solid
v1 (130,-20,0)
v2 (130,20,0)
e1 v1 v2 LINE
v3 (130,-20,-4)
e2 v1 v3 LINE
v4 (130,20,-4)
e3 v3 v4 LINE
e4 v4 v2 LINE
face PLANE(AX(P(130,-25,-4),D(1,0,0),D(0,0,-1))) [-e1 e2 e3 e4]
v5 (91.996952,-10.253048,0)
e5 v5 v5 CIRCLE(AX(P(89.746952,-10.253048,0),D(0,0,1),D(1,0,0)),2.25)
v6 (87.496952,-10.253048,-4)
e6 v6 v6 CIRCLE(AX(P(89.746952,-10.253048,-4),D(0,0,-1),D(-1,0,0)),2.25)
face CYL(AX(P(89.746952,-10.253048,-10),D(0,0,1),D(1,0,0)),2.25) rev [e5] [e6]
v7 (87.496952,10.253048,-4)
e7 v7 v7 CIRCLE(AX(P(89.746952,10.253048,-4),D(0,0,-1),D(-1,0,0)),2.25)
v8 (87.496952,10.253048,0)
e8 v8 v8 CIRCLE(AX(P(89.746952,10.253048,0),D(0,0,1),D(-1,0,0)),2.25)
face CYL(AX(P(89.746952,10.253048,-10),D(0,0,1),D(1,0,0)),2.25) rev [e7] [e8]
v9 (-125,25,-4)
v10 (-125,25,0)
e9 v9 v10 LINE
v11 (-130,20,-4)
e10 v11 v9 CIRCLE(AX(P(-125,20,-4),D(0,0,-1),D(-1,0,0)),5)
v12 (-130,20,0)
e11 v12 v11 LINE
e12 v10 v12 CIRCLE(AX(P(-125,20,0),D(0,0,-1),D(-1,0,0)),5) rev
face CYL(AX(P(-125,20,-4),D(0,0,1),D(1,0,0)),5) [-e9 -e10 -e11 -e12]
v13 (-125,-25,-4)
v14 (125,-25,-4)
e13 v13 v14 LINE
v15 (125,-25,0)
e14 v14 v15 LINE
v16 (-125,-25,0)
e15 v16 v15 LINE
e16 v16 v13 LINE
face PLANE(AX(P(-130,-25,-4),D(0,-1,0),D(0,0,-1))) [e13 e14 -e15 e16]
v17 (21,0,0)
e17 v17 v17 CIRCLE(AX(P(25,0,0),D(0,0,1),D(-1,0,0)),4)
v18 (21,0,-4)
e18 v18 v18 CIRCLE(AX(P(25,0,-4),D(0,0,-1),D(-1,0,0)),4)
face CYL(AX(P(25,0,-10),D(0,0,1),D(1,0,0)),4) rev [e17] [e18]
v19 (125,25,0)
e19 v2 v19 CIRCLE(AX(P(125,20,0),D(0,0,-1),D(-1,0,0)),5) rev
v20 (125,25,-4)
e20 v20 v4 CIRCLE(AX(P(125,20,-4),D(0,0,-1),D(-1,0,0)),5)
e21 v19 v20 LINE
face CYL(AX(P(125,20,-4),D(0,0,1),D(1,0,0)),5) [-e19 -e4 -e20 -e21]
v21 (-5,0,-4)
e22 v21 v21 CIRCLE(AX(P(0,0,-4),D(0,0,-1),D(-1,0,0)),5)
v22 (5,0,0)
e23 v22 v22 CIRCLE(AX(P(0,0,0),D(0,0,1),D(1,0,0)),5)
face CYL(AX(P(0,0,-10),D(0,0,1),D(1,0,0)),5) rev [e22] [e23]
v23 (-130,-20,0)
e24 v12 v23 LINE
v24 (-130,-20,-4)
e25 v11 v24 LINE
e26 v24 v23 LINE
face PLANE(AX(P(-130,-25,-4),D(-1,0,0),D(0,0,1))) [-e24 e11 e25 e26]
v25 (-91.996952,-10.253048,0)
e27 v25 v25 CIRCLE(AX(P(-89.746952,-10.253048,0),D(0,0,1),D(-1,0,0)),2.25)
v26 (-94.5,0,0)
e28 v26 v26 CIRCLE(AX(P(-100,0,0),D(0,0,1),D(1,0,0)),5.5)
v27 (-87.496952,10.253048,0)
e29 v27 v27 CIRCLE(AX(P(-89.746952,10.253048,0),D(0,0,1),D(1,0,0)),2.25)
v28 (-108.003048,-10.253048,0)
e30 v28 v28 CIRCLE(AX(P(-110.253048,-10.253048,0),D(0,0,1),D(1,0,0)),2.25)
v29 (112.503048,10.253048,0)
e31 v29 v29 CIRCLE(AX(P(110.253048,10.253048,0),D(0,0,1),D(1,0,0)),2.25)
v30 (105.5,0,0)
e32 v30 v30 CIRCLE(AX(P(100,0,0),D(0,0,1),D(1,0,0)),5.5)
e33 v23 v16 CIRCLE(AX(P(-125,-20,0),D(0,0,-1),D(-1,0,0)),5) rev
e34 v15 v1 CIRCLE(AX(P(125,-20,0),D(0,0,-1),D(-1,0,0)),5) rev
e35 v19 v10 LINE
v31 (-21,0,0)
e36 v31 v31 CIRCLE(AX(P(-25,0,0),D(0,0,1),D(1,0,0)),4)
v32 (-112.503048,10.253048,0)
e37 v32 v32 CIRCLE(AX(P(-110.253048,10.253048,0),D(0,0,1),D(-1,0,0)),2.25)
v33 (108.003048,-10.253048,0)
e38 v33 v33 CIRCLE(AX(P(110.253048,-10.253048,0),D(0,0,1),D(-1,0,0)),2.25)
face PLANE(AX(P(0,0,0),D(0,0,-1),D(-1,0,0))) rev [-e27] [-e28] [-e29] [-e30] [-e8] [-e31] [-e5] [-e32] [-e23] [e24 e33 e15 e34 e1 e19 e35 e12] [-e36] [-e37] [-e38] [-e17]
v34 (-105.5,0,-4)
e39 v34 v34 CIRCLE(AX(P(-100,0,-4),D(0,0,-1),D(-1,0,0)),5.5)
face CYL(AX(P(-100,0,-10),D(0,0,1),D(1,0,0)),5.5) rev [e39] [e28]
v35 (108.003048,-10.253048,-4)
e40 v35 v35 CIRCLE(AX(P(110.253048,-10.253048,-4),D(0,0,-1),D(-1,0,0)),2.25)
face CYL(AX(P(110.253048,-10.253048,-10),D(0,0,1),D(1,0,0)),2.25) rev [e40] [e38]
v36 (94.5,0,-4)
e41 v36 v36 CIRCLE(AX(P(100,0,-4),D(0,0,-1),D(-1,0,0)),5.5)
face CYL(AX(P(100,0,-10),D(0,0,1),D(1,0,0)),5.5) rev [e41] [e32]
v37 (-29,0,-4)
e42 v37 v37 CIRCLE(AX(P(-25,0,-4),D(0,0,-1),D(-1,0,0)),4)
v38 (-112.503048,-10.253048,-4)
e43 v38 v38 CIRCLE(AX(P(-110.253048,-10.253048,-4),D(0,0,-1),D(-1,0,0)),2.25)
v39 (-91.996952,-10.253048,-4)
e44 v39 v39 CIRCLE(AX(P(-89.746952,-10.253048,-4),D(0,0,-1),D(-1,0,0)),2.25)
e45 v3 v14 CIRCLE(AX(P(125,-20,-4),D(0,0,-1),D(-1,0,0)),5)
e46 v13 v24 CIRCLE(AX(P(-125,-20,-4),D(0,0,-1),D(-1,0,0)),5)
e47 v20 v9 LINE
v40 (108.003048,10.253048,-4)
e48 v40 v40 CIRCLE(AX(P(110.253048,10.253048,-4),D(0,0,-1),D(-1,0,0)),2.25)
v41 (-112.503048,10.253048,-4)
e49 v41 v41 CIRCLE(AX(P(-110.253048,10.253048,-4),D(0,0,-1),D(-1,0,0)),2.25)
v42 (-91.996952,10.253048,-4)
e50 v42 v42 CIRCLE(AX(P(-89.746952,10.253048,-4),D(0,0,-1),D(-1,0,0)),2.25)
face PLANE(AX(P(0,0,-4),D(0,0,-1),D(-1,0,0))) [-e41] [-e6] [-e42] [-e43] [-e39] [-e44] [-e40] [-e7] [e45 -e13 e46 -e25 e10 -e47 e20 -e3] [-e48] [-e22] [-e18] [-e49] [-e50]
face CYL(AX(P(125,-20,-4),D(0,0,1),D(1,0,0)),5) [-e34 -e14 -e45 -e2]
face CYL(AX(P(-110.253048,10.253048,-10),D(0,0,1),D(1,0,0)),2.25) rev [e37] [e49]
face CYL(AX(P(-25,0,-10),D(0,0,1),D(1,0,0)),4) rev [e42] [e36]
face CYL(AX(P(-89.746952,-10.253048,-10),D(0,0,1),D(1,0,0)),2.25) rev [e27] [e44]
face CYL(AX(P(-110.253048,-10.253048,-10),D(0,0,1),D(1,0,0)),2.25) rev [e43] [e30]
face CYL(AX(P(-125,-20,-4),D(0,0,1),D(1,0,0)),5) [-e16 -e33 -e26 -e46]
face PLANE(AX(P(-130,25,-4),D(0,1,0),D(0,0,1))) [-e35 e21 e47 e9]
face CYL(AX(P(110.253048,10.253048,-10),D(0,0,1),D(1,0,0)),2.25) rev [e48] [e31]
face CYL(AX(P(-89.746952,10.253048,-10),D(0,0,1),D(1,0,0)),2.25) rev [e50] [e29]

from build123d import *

# Parameters (mm, degrees)
SKETCH1_W          = 260
SKETCH1_H          = 50
BASE_FLANGE1_DEPTH = 4
SKETCH6_R          = 5.5
SKETCH6_R_2        = 5
SKETCH6_R_3        = 4
SKETCH6_R_4        = 2.25
CUT_EXTRUDE1_DEPTH = 10
FILLET1_R          = 5


# Sheet-metal steps are written as plain solids
with BuildPart() as part:
    # Sketch1 → Base-Flange1 (new body)
    with BuildSketch(Plane.XY):
        Rectangle(SKETCH1_W, SKETCH1_H)
    extrude(amount=-BASE_FLANGE1_DEPTH)

    # Sketch6 → Cut-Extrude1 (cut)
    with BuildSketch(Plane.XY):
        with Locations((100, 0)):
            Circle(SKETCH6_R)
        with Locations((-100, 0)):
            Circle(SKETCH6_R)
        Circle(SKETCH6_R_2)
        with Locations((-25, 0)):
            Circle(SKETCH6_R_3)
        with Locations(Location((25, 0, 0), (0, 0, 180))):
            Circle(SKETCH6_R_3)
        with Locations((110.253048327, 10.253048327)):
            Circle(SKETCH6_R_4)
        with Locations(Location((89.746951673, 10.253048327, 0), (0, 0, 180))):
            Circle(SKETCH6_R_4)
        with Locations((89.746951673, -10.253048327)):
            Circle(SKETCH6_R_4)
        with Locations(Location((110.253048327, -10.253048327, 0), (0, 0, 180))):
            Circle(SKETCH6_R_4)
        with Locations((-110.253048327, -10.253048327)):
            Circle(SKETCH6_R_4)
        with Locations(Location((-89.746951673, -10.253048327, 0), (0, 0, 180))):
            Circle(SKETCH6_R_4)
        with Locations((-89.746951673, 10.253048327)):
            Circle(SKETCH6_R_4)
        with Locations(Location((-110.253048327, 10.253048327, 0), (0, 0, 180))):
            Circle(SKETCH6_R_4)
    extrude(amount=-CUT_EXTRUDE1_DEPTH, mode=Mode.SUBTRACT)

    # Fillet1
    fillet1_edges = [part.edges().sort_by_distance(p)[0] for p in [
        (130, -25, -2),
        (-130, -25, -2),
        (-130, 25, -2),
        (130, 25, -2),
    ]]
    fillet(fillet1_edges, radius=FILLET1_R)


solid = part.part
